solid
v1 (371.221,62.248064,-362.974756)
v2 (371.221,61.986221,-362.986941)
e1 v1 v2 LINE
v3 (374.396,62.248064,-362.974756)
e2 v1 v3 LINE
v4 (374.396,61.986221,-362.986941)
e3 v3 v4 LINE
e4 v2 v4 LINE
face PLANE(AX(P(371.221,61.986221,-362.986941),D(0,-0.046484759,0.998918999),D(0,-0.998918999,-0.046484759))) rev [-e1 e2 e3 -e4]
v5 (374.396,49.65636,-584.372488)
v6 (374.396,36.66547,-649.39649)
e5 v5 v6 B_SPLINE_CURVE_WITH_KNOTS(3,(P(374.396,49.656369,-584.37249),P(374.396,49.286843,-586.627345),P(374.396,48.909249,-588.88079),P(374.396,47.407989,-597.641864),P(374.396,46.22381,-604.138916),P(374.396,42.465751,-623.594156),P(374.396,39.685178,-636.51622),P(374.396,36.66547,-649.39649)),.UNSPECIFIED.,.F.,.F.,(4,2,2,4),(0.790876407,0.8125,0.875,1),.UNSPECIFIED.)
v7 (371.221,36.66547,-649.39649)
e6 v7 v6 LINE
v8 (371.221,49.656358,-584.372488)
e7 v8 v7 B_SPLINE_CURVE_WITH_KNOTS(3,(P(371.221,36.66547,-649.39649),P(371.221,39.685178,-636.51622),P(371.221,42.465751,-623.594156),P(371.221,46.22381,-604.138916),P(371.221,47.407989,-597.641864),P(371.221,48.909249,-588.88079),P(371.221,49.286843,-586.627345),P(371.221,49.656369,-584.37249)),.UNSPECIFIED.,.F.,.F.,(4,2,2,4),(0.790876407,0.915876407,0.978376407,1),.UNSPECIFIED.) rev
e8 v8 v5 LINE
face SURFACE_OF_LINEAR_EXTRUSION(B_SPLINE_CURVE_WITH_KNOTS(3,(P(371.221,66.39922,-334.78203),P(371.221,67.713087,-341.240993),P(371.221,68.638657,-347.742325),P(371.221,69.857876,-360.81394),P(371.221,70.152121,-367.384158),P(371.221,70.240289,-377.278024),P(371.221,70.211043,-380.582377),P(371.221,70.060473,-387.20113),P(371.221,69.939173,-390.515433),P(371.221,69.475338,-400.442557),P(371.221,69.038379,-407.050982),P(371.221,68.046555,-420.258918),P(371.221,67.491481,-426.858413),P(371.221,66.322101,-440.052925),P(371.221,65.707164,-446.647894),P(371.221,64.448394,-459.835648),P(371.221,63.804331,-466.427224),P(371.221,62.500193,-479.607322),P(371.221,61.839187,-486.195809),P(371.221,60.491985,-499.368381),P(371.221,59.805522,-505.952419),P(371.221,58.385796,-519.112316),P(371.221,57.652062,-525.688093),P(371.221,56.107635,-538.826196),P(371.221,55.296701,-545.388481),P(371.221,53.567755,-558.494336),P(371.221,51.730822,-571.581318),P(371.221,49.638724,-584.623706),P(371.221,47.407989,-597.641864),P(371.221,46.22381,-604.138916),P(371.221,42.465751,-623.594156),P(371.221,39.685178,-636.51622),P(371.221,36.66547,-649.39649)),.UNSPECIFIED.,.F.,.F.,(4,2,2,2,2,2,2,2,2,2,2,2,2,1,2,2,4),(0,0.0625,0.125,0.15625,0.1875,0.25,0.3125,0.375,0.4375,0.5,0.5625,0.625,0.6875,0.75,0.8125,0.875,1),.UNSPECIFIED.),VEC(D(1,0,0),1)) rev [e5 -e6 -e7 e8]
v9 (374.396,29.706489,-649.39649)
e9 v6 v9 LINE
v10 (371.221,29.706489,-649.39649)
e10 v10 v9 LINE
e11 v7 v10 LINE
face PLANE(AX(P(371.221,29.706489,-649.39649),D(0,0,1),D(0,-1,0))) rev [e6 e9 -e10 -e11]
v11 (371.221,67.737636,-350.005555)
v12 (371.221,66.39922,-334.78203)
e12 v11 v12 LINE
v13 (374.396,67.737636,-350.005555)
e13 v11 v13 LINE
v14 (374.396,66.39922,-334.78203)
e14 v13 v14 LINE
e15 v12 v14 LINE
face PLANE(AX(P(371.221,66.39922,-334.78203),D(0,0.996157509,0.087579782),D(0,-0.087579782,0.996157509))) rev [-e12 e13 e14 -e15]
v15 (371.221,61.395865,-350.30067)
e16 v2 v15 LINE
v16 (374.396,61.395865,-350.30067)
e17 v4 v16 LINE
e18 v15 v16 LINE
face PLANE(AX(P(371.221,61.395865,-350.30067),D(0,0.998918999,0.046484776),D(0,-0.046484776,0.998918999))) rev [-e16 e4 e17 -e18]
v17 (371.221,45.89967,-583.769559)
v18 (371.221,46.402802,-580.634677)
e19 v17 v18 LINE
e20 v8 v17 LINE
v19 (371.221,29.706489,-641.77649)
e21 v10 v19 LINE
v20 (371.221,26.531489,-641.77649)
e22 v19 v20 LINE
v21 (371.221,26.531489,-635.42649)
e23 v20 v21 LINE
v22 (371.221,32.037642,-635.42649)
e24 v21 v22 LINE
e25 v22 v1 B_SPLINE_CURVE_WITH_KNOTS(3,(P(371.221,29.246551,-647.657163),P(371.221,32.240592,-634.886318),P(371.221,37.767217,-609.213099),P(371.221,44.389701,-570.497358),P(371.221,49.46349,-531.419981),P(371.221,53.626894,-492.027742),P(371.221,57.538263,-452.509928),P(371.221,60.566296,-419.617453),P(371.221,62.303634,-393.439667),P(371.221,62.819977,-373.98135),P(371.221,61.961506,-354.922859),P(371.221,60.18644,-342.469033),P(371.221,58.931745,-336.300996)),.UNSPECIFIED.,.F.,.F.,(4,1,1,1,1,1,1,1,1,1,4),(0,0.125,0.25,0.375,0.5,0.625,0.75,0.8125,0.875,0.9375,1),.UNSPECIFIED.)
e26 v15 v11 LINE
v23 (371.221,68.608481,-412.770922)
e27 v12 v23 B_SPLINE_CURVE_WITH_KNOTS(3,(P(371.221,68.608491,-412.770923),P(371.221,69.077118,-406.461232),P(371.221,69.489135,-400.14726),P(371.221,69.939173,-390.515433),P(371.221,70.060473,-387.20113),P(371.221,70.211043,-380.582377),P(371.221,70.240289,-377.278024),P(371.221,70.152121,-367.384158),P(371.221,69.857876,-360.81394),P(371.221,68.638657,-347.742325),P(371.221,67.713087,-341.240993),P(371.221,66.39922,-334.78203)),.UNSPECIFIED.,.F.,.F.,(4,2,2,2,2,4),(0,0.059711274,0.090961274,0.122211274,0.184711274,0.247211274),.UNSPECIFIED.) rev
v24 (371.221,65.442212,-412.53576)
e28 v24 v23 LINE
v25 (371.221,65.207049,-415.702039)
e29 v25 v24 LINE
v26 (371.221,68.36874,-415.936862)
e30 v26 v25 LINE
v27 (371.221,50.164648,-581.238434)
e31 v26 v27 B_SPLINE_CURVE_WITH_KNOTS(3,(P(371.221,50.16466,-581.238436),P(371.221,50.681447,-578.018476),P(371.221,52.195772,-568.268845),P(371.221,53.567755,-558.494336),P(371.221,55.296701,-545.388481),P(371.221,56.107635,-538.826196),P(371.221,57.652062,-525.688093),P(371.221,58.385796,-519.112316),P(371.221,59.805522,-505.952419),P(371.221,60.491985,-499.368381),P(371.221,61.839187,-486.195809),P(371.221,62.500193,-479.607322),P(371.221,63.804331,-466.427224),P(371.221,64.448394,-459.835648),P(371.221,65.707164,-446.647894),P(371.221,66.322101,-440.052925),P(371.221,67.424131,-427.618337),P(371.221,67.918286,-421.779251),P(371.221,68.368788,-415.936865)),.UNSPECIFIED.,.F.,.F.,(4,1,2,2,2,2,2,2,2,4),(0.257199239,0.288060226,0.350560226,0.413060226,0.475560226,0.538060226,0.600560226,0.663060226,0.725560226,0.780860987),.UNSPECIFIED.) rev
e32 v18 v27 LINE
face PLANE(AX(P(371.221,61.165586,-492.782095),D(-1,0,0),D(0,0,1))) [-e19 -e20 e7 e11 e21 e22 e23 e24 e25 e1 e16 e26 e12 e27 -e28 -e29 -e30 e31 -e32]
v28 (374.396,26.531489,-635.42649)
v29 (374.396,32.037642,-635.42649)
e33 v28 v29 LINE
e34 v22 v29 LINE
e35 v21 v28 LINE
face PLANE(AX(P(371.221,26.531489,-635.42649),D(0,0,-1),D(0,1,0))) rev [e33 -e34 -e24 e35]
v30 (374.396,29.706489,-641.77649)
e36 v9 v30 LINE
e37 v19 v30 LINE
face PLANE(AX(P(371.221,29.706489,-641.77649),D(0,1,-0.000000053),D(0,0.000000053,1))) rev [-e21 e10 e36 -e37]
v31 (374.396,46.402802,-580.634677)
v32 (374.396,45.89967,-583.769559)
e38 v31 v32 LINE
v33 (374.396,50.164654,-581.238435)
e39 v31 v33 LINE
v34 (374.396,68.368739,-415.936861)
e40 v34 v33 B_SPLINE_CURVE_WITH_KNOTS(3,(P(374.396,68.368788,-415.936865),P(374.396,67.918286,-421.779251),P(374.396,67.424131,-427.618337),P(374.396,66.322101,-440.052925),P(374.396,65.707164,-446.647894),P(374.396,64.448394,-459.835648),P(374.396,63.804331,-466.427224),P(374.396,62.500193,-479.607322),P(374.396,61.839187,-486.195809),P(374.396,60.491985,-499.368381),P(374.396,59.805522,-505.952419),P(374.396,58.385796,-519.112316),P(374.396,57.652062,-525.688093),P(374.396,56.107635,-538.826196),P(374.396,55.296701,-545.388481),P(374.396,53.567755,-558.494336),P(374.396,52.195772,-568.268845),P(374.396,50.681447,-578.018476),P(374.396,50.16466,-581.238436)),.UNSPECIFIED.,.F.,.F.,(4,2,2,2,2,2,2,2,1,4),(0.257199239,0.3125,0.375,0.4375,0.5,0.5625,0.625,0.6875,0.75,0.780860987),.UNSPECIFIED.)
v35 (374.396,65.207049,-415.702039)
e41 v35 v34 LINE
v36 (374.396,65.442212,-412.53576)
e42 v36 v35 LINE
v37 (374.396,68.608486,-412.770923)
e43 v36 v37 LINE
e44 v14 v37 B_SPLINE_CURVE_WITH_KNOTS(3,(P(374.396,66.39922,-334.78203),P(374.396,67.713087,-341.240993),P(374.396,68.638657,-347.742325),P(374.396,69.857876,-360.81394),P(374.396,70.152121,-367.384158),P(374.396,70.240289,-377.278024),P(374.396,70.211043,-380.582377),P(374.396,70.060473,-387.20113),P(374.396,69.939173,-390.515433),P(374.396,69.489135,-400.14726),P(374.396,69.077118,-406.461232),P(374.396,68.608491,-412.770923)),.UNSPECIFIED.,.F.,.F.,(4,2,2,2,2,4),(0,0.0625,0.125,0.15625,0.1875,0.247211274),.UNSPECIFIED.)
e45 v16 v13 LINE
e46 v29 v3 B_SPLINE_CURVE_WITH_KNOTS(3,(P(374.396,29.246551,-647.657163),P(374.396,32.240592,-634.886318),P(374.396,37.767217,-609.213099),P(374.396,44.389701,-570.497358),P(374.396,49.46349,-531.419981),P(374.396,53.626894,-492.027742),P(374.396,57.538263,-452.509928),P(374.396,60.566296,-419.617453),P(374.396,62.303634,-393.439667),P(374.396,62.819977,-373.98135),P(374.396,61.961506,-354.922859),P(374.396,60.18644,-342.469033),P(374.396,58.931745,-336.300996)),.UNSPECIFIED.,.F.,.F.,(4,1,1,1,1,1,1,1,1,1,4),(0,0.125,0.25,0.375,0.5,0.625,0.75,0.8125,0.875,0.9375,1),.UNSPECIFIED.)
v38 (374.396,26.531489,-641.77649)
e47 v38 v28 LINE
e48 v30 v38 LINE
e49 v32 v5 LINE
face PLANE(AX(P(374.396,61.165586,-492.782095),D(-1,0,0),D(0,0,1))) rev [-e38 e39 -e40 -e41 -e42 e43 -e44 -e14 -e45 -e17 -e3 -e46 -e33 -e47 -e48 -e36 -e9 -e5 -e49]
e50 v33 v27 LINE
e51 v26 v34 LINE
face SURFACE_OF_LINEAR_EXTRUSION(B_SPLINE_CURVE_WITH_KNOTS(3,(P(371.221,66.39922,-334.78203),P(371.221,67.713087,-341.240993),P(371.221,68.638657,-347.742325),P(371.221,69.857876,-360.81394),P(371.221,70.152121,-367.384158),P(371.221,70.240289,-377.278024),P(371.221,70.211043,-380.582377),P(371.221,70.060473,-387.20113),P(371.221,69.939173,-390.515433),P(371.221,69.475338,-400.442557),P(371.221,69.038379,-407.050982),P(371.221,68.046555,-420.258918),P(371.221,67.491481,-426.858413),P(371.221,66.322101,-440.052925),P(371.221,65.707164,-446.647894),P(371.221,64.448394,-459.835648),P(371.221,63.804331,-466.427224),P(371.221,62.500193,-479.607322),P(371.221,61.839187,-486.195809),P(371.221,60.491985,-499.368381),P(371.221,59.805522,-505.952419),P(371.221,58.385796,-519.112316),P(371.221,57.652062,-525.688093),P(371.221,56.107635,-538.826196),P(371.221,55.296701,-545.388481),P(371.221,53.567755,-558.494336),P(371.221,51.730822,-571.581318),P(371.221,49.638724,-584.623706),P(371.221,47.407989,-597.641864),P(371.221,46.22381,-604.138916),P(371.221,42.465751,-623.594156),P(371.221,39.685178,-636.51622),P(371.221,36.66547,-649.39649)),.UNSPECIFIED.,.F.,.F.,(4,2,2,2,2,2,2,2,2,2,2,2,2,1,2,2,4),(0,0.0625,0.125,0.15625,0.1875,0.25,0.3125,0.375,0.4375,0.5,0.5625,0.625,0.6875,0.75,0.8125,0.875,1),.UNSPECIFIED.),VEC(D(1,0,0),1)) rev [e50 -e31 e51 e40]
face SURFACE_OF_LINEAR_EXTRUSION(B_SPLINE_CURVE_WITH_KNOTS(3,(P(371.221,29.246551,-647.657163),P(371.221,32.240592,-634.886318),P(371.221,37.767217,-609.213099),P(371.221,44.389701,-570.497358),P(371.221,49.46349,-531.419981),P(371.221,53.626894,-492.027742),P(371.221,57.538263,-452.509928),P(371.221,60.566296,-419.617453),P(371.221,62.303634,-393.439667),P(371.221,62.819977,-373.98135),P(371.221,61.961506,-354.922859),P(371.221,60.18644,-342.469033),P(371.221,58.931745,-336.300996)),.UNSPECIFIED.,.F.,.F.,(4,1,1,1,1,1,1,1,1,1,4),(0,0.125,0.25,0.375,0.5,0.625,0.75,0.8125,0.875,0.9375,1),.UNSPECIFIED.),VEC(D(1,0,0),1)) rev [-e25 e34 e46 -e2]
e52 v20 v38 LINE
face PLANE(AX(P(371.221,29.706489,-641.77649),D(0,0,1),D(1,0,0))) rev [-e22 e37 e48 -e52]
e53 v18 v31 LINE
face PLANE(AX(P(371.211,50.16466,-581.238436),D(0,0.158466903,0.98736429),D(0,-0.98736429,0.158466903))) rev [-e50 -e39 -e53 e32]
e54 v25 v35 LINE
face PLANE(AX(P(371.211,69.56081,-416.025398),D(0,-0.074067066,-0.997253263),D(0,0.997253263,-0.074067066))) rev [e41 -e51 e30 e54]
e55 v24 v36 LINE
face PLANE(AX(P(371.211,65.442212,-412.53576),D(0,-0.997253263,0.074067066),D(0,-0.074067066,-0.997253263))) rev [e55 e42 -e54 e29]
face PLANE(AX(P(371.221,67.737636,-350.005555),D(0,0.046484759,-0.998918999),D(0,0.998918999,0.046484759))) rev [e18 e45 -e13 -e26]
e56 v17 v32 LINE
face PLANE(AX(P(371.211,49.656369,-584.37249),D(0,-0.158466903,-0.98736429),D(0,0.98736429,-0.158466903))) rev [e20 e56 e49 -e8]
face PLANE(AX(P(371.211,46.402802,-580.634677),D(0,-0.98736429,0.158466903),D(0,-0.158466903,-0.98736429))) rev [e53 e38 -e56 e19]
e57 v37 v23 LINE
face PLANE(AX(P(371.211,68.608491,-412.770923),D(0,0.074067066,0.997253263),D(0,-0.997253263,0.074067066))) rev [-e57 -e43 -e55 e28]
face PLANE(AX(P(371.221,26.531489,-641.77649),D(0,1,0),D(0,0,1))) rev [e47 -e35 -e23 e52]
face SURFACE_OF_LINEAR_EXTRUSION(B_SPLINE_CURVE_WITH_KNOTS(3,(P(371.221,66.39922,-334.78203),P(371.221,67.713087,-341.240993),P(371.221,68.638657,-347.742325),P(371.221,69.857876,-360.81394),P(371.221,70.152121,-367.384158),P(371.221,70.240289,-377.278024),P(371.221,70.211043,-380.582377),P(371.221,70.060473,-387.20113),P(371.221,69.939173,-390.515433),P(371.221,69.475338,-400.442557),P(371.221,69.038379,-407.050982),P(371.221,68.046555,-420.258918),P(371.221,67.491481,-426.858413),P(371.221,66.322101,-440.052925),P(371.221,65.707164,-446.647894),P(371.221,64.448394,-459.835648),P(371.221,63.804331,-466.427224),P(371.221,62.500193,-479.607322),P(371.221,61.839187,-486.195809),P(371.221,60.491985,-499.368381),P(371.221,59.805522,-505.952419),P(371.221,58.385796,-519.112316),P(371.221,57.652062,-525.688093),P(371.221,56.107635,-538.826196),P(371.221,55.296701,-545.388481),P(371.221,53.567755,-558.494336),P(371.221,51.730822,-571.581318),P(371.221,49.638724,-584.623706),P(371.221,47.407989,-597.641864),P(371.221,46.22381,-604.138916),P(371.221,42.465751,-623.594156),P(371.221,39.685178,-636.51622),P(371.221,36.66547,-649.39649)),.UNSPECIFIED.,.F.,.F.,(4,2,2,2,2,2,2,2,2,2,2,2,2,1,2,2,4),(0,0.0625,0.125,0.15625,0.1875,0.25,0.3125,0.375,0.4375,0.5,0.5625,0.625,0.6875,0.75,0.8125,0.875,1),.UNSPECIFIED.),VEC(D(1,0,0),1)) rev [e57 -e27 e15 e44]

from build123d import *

# Parameters (mm, degrees)
BOSS_EXTRUDE1_DEPTH = 3.175
CUT_EXTRUDE2_DEPTH  = 654.189890262


# Read off the part's stored shape, not the designer's step: Boss-Extrude1
with BuildPart() as part:
    # Boss-Extrude1 outline → Boss-Extrude1 (new body)
    with BuildSketch(Plane.ZY.offset(-374.396)):
        with BuildLine():
            Line((-350.005555185, 67.737635502), (-334.782029636, 66.399219608))
            add(Edge.make_bspline(
                [(-334.782029636, 66.399219608), (-341.240992873, 67.71308737), (-347.74232472, 68.638657355), (-360.813939728, 69.857875705), (-367.384157752, 70.152121032), (-377.278023699, 70.240289498), (-380.582377007, 70.21104298), (-387.201130434, 70.060473417), (-390.515432634, 69.93917268), (-400.442556531, 69.475337941), (-407.050981704, 69.038378743), (-420.258917861, 68.046554904), (-426.858412994, 67.491480581), (-440.052925111, 66.322100745), (-446.647894367, 65.707163942), (-459.835648192, 64.448394083), (-466.427223814, 63.804330657), (-479.607322045, 62.50019263), (-486.195809267, 61.839186708), (-499.368381394, 60.491985482), (-505.952419458, 59.805522168), (-519.112316449, 58.385795781), (-525.688093125, 57.65206208), (-538.826196256, 56.107634603), (-545.388480731, 55.296700626), (-558.494335759, 53.567754504), (-571.581318222, 51.730822492), (-584.623705512, 49.638723817), (-597.641863597, 47.407989391), (-604.13891642, 46.223810013), (-623.594156247, 42.465750982), (-636.516219668, 39.685177786), (-649.396489798, 36.665469863)],
                knots=[0, 0, 0, 0, 0.0625, 0.0625, 0.125, 0.125, 0.15625, 0.15625, 0.1875, 0.1875, 0.25, 0.25, 0.3125, 0.3125, 0.375, 0.375, 0.4375, 0.4375, 0.5, 0.5, 0.5625, 0.5625, 0.625, 0.625, 0.6875, 0.6875, 0.75, 0.8125, 0.8125, 0.875, 0.875, 1, 1, 1, 1], degree=3))
            Line((-649.396489798, 36.665469863), (-649.396489798, 29.706488542))
            Line((-649.396489798, 29.706488542), (-641.776489798, 29.706488949))
            Line((-641.776489798, 29.706488949), (-641.776489798, 26.531488949))
            Line((-641.776489798, 26.531488949), (-635.426489798, 26.531488949))
            Line((-635.426489798, 26.531488949), (-635.426489798, 32.037642177))
            add(Edge.make_bspline(
                [(-635.426489798, 32.037642177), (-626.699809587, 33.973901403), (-605.09971112, 38.470828669), (-570.497357953, 44.389700719), (-531.419980681, 49.46349027), (-492.027742402, 53.62689392), (-452.50992836, 57.538262976), (-419.617452947, 60.566295678), (-393.439667345, 62.303633962), (-376.715776716, 62.747417071), (-366.64401335, 62.448215888), (-362.974756295, 62.248064299)],
                knots=[0.039842207, 0.039842207, 0.039842207, 0.039842207, 0.125, 0.25, 0.375, 0.5, 0.625, 0.75, 0.8125, 0.875, 0.911151113, 0.911151113, 0.911151113, 0.911151113], degree=3))
            Line((-362.974756295, 62.248064299), (-362.98694118, 61.986221215))
            Line((-362.98694118, 61.986221215), (-350.300669898, 61.395864564))
            Line((-350.300669898, 61.395864564), (-350.005555185, 67.737635502))
        make_face()
    extrude(amount=BOSS_EXTRUDE1_DEPTH)

    # Sketch4 → Cut-Extrude2 (cut, through all)
    with BuildSketch(Plane(origin=(374.396, 0, 0), x_dir=(0, 0, -1), z_dir=(1, 0, 0))):
        Polygon((412.770923092, 68.608490806), (412.535760157, 65.442211698), (415.702039265, 65.207048762), (415.936865021, 68.368788015), (416.025397802, 69.560810453), (412.859118694, 69.795973389), align=None)
        Polygon((581.238436134, 50.164660341), (580.634677235, 46.402802397), (583.769558855, 45.899669981), (584.372489798, 49.656369157), (584.640659894, 51.327264289), (581.505778274, 51.830396705), align=None)
    extrude(amount=-CUT_EXTRUDE2_DEPTH, mode=Mode.SUBTRACT)


solid = part.part
